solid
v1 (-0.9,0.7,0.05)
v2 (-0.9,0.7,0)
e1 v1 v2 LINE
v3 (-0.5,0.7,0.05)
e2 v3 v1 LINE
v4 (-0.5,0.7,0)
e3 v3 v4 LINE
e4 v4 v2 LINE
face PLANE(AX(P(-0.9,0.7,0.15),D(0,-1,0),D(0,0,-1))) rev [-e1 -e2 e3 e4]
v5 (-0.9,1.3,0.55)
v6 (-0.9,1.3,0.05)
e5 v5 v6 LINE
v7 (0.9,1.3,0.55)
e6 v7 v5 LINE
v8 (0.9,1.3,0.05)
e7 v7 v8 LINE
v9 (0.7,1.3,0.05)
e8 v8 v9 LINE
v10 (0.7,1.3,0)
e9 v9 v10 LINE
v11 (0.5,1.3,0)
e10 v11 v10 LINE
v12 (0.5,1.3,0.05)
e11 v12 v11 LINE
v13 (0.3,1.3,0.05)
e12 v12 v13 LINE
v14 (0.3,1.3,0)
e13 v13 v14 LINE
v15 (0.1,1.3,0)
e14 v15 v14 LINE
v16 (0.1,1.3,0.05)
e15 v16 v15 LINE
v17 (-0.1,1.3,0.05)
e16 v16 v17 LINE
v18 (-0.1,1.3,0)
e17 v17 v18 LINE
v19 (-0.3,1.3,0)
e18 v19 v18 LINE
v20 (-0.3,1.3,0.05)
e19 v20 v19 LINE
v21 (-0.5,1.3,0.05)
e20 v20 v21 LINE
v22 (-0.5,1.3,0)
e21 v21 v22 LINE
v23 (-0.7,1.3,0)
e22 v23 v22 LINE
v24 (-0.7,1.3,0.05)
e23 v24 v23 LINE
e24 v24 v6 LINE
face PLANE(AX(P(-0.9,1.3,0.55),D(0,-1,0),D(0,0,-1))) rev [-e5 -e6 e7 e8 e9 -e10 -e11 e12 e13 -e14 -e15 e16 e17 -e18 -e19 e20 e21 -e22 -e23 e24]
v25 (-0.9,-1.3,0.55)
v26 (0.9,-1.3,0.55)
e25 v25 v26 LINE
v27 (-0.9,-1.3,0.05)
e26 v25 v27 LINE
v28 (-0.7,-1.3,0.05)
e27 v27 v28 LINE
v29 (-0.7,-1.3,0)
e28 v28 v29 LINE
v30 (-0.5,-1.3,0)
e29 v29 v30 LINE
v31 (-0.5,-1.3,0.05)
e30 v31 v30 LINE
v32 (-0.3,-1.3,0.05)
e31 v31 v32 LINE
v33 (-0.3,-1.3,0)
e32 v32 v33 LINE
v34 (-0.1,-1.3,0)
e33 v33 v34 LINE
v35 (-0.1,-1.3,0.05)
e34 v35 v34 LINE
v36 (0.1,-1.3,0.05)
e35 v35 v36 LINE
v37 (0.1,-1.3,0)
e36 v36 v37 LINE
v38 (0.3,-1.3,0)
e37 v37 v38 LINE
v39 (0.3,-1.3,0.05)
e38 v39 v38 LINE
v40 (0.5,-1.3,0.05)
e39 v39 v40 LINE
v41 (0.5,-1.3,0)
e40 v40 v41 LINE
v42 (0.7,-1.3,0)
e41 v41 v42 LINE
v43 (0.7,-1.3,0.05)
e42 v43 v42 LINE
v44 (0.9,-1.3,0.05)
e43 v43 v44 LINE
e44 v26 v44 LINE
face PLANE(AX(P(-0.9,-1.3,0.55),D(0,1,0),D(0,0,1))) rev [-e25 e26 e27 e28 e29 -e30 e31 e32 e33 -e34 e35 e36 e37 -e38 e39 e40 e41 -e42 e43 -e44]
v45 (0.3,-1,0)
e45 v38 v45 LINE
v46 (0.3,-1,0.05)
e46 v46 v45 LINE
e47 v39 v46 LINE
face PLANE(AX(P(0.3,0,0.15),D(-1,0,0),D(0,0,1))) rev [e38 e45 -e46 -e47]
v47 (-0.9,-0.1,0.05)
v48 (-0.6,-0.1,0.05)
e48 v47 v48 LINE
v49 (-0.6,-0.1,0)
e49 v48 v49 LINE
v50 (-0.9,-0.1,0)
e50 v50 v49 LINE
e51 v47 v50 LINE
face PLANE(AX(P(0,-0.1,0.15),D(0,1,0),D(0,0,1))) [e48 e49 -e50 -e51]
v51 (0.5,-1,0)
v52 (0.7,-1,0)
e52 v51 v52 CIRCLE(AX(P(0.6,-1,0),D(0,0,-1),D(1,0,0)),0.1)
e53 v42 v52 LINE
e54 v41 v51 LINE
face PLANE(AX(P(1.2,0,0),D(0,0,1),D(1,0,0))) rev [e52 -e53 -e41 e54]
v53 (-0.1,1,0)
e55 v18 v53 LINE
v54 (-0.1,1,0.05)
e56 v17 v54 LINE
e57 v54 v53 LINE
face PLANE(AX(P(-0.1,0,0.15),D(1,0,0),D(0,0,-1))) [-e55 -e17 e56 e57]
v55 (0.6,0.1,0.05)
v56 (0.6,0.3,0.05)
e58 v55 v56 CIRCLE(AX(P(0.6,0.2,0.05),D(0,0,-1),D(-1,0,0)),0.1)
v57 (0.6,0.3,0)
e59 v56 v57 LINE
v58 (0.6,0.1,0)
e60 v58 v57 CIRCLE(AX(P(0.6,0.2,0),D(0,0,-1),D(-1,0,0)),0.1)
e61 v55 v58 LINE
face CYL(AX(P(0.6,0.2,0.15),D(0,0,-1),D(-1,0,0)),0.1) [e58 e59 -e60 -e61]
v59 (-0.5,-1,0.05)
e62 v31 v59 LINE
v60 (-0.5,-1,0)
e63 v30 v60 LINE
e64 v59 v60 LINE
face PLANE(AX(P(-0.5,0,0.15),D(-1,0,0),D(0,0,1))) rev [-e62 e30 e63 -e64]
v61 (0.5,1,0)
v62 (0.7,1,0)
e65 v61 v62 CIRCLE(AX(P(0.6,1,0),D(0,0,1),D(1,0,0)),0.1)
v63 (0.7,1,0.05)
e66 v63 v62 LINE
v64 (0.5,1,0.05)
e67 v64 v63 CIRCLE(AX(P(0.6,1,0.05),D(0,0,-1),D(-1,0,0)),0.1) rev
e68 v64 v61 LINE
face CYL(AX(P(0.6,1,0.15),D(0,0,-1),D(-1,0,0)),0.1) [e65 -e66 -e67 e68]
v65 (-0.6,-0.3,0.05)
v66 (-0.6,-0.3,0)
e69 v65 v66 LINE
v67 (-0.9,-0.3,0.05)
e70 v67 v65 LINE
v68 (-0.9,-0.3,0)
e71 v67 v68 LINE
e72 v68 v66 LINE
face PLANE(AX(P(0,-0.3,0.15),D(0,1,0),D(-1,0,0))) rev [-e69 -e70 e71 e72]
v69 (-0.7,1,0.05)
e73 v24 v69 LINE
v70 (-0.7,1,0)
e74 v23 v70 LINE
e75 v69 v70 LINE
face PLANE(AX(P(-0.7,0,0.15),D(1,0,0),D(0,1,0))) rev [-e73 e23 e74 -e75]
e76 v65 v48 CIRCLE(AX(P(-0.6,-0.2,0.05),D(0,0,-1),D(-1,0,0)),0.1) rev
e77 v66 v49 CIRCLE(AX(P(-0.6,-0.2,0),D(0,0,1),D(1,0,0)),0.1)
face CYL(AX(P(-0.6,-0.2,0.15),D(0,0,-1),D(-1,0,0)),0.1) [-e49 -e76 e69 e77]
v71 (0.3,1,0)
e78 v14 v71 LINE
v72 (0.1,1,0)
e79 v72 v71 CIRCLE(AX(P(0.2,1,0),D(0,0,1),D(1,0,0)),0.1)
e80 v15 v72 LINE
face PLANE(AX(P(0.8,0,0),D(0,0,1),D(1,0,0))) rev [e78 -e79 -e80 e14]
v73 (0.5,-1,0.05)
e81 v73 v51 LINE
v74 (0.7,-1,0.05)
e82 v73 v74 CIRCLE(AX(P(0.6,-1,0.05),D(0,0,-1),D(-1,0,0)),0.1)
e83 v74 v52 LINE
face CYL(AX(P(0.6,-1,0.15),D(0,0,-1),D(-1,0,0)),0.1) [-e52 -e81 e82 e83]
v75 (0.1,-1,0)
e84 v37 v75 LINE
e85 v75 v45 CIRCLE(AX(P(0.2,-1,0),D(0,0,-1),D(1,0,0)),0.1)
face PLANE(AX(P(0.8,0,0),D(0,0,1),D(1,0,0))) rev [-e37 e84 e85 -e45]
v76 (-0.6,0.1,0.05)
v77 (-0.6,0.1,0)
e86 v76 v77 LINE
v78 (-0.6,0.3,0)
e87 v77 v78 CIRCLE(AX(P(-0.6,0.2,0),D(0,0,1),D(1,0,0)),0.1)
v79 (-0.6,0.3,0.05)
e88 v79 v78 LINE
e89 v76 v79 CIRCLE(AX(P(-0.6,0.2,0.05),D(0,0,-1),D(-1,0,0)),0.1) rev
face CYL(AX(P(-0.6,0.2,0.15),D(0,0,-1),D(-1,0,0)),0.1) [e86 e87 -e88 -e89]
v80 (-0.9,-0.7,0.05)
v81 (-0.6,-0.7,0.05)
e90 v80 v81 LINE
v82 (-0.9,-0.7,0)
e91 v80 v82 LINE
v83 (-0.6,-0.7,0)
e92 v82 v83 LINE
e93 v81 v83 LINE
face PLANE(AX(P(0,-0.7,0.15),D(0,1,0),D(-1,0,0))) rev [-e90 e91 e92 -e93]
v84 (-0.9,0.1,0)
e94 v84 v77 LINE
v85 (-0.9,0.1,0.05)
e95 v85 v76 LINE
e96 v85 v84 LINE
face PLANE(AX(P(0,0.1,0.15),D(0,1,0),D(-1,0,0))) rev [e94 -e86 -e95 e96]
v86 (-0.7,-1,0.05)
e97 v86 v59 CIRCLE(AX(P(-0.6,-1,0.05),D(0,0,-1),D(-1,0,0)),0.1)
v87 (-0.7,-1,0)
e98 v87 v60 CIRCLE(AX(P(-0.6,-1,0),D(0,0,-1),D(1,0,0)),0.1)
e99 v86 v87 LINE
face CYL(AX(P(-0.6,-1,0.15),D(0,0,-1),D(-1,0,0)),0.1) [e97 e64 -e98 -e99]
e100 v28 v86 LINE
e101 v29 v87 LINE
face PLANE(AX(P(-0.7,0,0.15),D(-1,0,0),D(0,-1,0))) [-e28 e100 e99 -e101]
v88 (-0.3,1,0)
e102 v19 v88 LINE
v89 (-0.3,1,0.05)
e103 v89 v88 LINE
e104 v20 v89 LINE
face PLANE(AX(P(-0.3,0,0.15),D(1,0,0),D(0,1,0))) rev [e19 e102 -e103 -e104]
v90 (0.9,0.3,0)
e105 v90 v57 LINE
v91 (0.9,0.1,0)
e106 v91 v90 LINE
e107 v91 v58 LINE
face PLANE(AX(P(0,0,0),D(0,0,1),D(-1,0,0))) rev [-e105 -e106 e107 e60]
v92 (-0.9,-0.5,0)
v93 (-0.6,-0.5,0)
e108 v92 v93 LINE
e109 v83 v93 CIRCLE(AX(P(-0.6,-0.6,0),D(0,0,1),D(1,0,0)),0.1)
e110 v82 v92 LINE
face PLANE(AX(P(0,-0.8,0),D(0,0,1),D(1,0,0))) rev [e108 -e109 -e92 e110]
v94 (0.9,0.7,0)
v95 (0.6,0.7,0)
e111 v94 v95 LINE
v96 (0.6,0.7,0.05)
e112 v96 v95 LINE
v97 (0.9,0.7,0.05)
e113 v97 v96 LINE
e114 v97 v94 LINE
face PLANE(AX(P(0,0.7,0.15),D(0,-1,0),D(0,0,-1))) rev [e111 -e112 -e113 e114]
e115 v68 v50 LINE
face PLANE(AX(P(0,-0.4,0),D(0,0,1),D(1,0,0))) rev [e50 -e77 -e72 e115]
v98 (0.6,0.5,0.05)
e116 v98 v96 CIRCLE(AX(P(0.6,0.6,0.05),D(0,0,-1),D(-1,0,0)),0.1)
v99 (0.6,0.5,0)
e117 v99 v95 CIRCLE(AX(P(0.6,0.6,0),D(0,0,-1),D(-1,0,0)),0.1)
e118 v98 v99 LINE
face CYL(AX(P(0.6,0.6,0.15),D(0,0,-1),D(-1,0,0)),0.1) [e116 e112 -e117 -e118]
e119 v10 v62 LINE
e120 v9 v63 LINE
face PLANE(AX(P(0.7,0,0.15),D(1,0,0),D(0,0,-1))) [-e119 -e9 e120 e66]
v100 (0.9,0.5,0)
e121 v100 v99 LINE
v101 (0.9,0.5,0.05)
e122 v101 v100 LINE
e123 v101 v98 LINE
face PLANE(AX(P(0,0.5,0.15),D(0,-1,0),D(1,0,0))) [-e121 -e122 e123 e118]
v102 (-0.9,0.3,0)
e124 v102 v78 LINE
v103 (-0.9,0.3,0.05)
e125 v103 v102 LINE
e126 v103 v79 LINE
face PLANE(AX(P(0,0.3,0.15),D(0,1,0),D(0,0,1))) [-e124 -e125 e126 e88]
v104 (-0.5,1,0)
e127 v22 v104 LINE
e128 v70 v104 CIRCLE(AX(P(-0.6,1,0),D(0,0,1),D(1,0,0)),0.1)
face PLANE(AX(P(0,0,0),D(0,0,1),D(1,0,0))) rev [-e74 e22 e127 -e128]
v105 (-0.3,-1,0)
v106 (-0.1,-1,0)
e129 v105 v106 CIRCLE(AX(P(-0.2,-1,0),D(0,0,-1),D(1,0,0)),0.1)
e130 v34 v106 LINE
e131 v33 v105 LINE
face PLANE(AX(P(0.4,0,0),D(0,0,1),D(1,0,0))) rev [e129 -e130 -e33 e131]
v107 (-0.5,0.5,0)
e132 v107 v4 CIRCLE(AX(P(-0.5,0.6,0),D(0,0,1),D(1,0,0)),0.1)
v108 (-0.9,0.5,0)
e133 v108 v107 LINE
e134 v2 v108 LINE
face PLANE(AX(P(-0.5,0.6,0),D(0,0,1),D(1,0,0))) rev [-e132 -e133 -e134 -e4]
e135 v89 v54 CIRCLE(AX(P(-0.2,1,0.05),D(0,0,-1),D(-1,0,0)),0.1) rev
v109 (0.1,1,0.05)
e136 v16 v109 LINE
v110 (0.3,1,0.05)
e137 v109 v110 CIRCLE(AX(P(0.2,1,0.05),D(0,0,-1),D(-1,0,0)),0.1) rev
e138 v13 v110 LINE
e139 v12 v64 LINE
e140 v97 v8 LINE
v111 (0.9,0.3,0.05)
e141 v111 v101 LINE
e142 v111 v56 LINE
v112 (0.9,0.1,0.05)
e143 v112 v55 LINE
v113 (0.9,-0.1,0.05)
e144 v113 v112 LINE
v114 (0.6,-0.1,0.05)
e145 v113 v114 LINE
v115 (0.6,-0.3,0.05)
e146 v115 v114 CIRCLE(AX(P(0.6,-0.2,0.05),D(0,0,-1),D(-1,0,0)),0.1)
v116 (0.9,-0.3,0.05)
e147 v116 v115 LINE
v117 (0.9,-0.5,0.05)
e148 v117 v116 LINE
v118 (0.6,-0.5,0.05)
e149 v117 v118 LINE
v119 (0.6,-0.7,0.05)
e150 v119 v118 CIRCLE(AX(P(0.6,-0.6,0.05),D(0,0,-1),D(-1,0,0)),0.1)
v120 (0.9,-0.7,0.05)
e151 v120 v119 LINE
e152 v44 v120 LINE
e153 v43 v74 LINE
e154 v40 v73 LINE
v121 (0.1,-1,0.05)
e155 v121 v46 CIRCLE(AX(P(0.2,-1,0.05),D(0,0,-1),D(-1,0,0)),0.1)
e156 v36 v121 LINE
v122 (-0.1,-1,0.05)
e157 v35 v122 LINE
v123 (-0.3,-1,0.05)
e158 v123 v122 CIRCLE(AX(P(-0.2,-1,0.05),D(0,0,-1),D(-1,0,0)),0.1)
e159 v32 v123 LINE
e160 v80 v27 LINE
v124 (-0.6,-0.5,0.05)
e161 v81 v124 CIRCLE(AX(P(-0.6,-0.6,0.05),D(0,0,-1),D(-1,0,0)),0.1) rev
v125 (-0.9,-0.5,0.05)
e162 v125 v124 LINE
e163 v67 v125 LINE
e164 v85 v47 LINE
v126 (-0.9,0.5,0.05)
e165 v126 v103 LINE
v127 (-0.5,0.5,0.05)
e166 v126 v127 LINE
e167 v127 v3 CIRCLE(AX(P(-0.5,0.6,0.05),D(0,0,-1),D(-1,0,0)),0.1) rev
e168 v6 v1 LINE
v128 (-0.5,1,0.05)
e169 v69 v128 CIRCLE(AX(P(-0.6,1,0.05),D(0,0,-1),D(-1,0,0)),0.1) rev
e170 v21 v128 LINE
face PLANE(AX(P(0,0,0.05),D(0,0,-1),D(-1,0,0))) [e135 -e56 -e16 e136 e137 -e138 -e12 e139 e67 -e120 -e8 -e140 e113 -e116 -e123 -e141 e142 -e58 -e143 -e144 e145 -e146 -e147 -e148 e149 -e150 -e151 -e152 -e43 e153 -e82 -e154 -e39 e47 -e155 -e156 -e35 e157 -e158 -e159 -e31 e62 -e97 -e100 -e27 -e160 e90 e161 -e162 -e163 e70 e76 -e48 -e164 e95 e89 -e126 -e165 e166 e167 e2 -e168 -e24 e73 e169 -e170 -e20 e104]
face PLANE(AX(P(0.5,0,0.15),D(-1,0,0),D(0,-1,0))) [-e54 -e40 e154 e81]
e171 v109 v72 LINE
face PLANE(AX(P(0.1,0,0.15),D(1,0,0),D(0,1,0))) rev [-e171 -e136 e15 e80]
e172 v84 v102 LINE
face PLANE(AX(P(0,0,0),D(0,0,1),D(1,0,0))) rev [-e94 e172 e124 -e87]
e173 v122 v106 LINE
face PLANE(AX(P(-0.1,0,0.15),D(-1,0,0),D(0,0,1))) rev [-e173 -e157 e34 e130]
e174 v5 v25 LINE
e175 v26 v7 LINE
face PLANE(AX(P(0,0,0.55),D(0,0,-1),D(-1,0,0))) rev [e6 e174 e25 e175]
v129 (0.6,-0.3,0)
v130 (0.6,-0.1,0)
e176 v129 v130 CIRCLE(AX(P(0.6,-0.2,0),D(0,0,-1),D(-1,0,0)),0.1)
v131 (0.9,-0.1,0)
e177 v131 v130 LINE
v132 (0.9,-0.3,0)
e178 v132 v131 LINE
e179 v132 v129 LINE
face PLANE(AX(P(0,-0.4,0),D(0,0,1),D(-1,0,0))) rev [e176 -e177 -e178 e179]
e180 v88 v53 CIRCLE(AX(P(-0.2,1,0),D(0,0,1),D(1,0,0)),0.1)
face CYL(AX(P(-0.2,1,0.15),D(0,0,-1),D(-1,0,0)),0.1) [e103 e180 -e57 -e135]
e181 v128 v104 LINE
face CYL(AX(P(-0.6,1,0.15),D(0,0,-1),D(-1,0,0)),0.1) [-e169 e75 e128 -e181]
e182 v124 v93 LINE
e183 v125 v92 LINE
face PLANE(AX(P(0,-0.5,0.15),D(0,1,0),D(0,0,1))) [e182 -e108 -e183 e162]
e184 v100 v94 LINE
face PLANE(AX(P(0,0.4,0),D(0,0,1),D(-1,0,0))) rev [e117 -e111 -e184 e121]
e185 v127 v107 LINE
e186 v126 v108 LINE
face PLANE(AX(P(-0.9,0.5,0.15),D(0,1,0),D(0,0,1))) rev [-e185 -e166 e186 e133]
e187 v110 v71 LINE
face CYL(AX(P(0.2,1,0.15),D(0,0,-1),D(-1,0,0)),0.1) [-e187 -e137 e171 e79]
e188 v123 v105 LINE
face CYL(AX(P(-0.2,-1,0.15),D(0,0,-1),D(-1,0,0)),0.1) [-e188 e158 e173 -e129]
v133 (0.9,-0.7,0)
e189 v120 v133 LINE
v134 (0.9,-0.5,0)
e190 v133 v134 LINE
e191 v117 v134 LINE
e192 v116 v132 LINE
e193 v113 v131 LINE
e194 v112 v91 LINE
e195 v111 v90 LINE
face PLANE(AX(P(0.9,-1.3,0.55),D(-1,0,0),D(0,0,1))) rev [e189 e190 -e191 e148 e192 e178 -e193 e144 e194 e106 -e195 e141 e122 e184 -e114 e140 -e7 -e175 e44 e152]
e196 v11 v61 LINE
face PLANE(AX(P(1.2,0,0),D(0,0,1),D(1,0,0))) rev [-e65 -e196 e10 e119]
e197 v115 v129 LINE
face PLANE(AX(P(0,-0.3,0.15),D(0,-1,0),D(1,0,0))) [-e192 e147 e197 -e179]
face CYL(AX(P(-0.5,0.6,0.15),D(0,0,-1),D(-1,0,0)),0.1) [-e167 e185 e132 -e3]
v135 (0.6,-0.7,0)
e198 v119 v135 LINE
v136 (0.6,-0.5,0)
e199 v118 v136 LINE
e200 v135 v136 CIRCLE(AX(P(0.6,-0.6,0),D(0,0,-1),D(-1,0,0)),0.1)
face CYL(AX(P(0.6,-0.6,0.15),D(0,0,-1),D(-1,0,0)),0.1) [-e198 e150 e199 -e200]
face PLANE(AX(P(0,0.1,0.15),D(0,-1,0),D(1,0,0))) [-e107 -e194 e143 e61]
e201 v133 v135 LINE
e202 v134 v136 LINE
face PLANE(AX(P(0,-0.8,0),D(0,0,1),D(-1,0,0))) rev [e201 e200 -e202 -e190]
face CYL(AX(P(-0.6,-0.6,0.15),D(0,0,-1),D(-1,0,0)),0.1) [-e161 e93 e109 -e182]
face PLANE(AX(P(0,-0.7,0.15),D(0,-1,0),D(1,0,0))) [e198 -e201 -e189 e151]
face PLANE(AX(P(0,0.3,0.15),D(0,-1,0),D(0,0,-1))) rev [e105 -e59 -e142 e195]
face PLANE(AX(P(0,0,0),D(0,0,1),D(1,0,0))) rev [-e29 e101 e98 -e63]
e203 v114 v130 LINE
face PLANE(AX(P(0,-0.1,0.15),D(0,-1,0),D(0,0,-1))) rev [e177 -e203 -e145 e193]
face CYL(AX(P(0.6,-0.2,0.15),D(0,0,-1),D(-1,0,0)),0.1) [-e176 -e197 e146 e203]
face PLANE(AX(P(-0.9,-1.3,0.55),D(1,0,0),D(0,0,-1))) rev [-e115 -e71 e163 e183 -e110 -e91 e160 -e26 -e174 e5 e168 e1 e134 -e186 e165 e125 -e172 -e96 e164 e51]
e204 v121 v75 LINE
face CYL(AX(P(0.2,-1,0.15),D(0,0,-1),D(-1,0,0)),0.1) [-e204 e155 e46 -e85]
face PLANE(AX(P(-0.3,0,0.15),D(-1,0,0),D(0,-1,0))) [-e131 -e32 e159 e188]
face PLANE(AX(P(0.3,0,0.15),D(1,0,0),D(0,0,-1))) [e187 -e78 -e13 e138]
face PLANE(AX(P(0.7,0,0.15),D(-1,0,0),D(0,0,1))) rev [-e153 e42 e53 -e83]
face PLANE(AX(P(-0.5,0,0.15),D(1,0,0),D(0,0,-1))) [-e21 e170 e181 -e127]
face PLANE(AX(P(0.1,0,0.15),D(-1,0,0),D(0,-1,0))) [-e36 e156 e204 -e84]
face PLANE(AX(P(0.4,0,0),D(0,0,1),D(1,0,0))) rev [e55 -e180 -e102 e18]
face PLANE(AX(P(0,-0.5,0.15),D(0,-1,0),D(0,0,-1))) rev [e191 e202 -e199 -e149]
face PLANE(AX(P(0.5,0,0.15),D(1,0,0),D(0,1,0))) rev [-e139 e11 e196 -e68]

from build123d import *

# Parameters (mm, degrees)
BOSS_EXTRUDE1_START    = 0.05
SKETCH1_W              = 1.8
SKETCH1_H              = 2.6
BOSS_EXTRUDE1_DEPTH    = 0.5
BOSS_EXTRUDE2_DEPTH    = 0.15
BOSS_EXTRUDE3_DEPTH    = 0.15
BOSS_EXTRUDE4_DEPTH    = 0.15
LPATTERN5_COPY_1_DEPTH = 0.15
LPATTERN5_COPY_2_DEPTH = 0.15
LPATTERN6_COUNT        = 4
LPATTERN6_PITCH        = 0.4
LPATTERN6_COPY_1_DEPTH = 0.15
LPATTERN6_COPY_2_DEPTH = 0.15
LPATTERN6_COPY_3_DEPTH = 0.15
LPATTERN7_DEPTH        = 0.05


# Read off the part's stored shape, not the designer's step: LPattern7
with BuildPart() as part:
    # Sketch1 → Boss-Extrude1 (new body)
    with BuildSketch(Plane.XY.offset(BOSS_EXTRUDE1_START)):
        Rectangle(SKETCH1_W, SKETCH1_H)
    extrude(amount=BOSS_EXTRUDE1_DEPTH)

    # Sketch2 → Boss-Extrude2 (add)
    with BuildSketch(Plane.XY):
        with BuildLine():
            Line((-0.9, 0.7), (-0.5, 0.7))
            ThreePointArc((-0.5, 0.7), (-0.4, 0.6), (-0.5, 0.5))
            Line((-0.5, 0.5), (-0.9, 0.5))
            Line((-0.9, 0.5), (-0.9, 0.7))
        make_face()
    extrude(amount=BOSS_EXTRUDE2_DEPTH)

    # Sketch3 → Boss-Extrude3 (add)
    with BuildSketch(Plane.XY):
        with BuildLine():
            Line((-0.7, 1.3), (-0.7, 1))
            ThreePointArc((-0.7, 1), (-0.6, 0.9), (-0.5, 1))
            Line((-0.5, 1), (-0.5, 1.3))
            Line((-0.5, 1.3), (-0.7, 1.3))
        make_face()
    boss_extrude3 = extrude(amount=BOSS_EXTRUDE3_DEPTH)

    # Sketch3<3> → Boss-Extrude4 (add)
    with BuildSketch(Plane.XY):
        with BuildLine():
            Line((-0.9, 0.1), (-0.6, 0.1))
            ThreePointArc((-0.6, 0.1), (-0.5, 0.2), (-0.6, 0.3))
            Line((-0.6, 0.3), (-0.9, 0.3))
            Line((-0.9, 0.3), (-0.9, 0.1))
        make_face()
    boss_extrude4 = extrude(amount=BOSS_EXTRUDE4_DEPTH)

    # Mirror8: Boss-Extrude4 across plane
    add(boss_extrude4.mirror(Plane(origin=(0, 0, 0), x_dir=(0, 0, 1), z_dir=(1, 0, 0))))

    # Mirror9: Boss-Extrude3 across plane
    add(boss_extrude3.mirror(Plane.ZX))

    # LPattern5 copy 1 sketch → LPattern5 copy 1 (add)
    with BuildSketch(Plane(origin=(0, 0.4, 0), x_dir=(-1, 0, 0), z_dir=(0, 0, 1))):
        with BuildLine():
            Line((-0.9, -0.1), (-0.6, -0.1))
            ThreePointArc((-0.6, -0.1), (-0.5, -0.2), (-0.6, -0.3))
            Line((-0.6, -0.3), (-0.9, -0.3))
            Line((-0.9, -0.3), (-0.9, -0.1))
        make_face()
    extrude(amount=LPATTERN5_COPY_1_DEPTH)

    # LPattern5 copy 2 sketch → LPattern5 copy 2 (add)
    with BuildSketch(Plane(origin=(0, 0.4, 0), x_dir=(1, 0, 0), z_dir=(0, 0, 1))):
        with BuildLine():
            Line((-0.9, 0.1), (-0.6, 0.1))
            ThreePointArc((-0.6, 0.1), (-0.5, 0.2), (-0.6, 0.3))
            Line((-0.6, 0.3), (-0.9, 0.3))
            Line((-0.9, 0.3), (-0.9, 0.1))
        make_face()
    extrude(amount=LPATTERN5_COPY_2_DEPTH)

    # LPattern6: Boss-Extrude3 ×4
    with Locations(*[(i * LPATTERN6_PITCH, 0, 0) for i in range(1, LPATTERN6_COUNT)]):
        add(boss_extrude3)

    # LPattern6 copy 1 sketch → LPattern6 copy 1 (add)
    with BuildSketch(Plane(origin=(0.4, 0, 0), x_dir=(1, 0, 0), z_dir=(0, 0, 1))):
        with BuildLine():
            Line((-0.7, -1.3), (-0.7, -1))
            ThreePointArc((-0.7, -1), (-0.6, -0.9), (-0.5, -1))
            Line((-0.5, -1), (-0.5, -1.3))
            Line((-0.5, -1.3), (-0.7, -1.3))
        make_face()
    extrude(amount=LPATTERN6_COPY_1_DEPTH)

    # LPattern6 copy 2 sketch → LPattern6 copy 2 (add)
    with BuildSketch(Plane(origin=(0.8, 0, 0), x_dir=(1, 0, 0), z_dir=(0, 0, 1))):
        with BuildLine():
            Line((-0.7, -1.3), (-0.7, -1))
            ThreePointArc((-0.7, -1), (-0.6, -0.9), (-0.5, -1))
            Line((-0.5, -1), (-0.5, -1.3))
            Line((-0.5, -1.3), (-0.7, -1.3))
        make_face()
    extrude(amount=LPATTERN6_COPY_2_DEPTH)

    # LPattern6 copy 3 sketch → LPattern6 copy 3 (add)
    with BuildSketch(Plane(origin=(1.2, 0, 0), x_dir=(1, 0, 0), z_dir=(0, 0, 1))):
        with BuildLine():
            Line((-0.7, -1.3), (-0.7, -1))
            ThreePointArc((-0.7, -1), (-0.6, -0.9), (-0.5, -1))
            Line((-0.5, -1), (-0.5, -1.3))
            Line((-0.5, -1.3), (-0.7, -1.3))
        make_face()
    extrude(amount=LPATTERN6_COPY_3_DEPTH)

    # LPattern7 outline → LPattern7 (add)
    with BuildSketch(Plane.XY):
        with BuildLine():
            ThreePointArc((0.6, -0.1), (0.5, -0.2), (0.6, -0.3))
            Line((0.6, -0.3), (0.9, -0.3))
            Line((0.9, -0.3), (0.9, -0.1))
            Line((0.9, -0.1), (0.6, -0.1))
        make_face()
        with BuildLine():
            Line((0.9, -0.7), (0.9, -0.5))
            Line((0.9, -0.5), (0.6, -0.5))
            ThreePointArc((0.6, -0.5), (0.5, -0.6), (0.6, -0.7))
            Line((0.6, -0.7), (0.9, -0.7))
        make_face()
        with BuildLine():
            Line((-0.6, -0.5), (-0.9, -0.5))
            Line((-0.9, -0.5), (-0.9, -0.7))
            Line((-0.9, -0.7), (-0.6, -0.7))
            ThreePointArc((-0.6, -0.7), (-0.5, -0.6), (-0.6, -0.5))
        make_face()
        with BuildLine():
            Line((-0.9, -0.3), (-0.6, -0.3))
            ThreePointArc((-0.6, -0.3), (-0.5, -0.2), (-0.6, -0.1))
            Line((-0.6, -0.1), (-0.9, -0.1))
            Line((-0.9, -0.1), (-0.9, -0.3))
        make_face()
    extrude(amount=LPATTERN7_DEPTH)


solid = part.part
